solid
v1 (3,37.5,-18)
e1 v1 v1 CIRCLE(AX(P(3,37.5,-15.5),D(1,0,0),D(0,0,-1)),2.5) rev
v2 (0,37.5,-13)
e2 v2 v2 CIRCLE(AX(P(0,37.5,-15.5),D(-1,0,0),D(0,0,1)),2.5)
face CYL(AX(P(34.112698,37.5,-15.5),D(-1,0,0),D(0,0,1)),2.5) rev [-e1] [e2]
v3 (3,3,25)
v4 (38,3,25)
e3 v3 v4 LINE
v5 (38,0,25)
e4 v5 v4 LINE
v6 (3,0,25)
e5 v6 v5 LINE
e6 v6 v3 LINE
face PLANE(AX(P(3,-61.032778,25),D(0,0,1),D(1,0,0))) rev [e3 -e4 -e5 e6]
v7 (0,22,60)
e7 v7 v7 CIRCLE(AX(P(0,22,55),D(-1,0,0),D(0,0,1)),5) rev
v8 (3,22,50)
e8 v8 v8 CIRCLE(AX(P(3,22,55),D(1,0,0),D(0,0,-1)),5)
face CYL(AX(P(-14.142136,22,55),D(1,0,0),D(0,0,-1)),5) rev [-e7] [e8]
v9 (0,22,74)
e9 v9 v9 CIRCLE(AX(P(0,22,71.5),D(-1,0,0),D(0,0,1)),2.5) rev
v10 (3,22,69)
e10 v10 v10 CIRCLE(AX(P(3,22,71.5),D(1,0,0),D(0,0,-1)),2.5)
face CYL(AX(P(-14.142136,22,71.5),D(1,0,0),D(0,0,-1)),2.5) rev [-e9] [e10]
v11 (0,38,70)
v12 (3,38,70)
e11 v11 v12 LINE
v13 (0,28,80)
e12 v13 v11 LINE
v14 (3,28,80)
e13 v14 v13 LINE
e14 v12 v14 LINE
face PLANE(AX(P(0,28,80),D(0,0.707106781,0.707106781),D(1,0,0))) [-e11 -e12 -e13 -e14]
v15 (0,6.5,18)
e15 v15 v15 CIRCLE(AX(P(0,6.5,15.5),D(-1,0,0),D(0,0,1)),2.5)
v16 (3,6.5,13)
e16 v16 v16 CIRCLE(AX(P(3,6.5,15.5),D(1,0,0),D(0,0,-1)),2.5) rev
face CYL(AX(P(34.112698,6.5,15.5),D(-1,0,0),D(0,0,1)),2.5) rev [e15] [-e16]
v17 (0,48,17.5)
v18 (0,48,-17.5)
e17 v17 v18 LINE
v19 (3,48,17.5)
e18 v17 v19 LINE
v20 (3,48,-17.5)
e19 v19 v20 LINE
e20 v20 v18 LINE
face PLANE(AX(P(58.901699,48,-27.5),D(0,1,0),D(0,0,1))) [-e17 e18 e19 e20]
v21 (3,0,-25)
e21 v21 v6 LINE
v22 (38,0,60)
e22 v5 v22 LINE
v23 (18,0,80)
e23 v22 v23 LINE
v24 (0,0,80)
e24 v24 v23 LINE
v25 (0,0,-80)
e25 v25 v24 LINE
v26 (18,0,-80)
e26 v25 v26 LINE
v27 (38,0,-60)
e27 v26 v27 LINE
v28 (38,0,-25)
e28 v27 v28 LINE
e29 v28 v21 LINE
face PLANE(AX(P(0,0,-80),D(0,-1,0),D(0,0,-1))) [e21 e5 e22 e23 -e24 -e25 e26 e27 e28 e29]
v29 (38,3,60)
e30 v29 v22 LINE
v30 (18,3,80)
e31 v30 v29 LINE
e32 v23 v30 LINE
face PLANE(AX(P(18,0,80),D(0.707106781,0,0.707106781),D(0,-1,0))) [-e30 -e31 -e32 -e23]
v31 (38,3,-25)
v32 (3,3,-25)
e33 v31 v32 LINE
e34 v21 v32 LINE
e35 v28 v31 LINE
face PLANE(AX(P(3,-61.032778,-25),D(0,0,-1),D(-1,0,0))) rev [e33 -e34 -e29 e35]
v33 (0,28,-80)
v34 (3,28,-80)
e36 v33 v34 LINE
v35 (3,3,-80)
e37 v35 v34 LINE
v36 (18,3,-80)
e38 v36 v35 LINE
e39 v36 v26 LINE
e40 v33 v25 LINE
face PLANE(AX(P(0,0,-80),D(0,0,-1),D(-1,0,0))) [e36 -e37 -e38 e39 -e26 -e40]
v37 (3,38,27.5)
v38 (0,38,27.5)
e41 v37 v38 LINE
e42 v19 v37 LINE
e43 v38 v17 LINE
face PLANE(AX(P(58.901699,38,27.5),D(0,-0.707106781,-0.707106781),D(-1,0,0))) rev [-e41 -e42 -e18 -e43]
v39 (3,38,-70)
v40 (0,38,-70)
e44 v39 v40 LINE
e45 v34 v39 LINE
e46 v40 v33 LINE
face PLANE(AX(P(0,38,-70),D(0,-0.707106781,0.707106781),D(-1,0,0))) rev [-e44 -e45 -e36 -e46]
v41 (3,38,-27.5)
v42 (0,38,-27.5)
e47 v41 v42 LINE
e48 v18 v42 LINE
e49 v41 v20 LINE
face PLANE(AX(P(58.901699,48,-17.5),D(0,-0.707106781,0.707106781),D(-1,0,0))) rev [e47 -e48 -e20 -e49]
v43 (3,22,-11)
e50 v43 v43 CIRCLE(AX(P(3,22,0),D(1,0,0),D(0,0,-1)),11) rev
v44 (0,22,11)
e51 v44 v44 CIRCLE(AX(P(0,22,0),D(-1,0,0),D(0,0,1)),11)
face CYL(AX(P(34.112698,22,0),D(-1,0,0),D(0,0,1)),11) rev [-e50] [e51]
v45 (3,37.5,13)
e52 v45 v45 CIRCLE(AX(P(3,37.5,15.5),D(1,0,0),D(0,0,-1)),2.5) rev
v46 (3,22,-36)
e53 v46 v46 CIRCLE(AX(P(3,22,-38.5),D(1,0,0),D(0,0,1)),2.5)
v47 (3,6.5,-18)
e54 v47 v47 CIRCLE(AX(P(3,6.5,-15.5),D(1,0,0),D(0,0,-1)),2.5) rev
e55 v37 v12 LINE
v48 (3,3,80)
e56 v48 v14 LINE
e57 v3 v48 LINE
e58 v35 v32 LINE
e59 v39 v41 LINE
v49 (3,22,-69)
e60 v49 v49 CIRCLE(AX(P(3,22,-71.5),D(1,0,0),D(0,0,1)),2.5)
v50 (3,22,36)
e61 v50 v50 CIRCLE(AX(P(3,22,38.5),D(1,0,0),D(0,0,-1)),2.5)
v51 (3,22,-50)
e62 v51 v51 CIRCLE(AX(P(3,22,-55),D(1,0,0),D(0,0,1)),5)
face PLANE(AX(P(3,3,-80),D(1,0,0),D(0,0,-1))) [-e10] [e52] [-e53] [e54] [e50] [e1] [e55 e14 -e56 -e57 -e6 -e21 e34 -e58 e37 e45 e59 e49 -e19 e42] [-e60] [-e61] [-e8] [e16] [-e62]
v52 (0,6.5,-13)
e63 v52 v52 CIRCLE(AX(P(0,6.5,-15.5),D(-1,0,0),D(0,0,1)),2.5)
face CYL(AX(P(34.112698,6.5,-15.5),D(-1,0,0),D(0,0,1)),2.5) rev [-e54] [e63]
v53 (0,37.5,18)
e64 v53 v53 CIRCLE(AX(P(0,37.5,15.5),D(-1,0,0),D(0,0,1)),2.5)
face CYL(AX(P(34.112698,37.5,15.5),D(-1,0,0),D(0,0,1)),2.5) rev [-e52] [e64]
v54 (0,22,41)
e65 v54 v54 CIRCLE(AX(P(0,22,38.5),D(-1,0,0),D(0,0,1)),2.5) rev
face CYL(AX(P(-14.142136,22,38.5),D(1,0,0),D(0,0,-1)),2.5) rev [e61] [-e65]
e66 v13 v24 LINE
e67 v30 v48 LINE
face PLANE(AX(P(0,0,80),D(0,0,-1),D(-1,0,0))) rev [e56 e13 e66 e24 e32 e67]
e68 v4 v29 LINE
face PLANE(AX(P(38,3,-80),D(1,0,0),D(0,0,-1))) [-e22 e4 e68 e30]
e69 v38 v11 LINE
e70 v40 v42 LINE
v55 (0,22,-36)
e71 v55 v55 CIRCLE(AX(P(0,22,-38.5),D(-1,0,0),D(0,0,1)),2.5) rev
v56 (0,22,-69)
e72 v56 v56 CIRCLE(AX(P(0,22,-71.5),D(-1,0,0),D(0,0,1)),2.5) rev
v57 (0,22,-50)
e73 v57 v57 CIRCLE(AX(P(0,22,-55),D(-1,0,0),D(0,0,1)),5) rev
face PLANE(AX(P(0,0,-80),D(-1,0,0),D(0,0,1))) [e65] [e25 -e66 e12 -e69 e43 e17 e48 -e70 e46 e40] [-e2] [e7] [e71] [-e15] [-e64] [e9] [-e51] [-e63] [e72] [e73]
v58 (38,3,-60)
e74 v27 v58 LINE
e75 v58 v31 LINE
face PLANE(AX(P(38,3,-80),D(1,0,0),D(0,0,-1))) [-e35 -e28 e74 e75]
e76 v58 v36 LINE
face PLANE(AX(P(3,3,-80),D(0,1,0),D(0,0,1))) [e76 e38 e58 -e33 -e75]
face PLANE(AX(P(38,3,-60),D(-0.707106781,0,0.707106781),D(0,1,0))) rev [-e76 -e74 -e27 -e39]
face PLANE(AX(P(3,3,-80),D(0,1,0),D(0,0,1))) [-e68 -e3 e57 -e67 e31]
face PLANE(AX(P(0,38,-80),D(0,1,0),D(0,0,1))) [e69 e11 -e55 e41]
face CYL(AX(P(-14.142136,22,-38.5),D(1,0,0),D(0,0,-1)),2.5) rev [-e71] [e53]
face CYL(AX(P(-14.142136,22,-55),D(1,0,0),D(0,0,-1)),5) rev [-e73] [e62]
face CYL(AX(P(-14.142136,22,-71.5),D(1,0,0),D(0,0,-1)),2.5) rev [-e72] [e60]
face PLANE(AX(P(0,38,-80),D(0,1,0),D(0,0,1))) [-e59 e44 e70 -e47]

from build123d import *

# Parameters (mm, degrees)
SALIENTE_EXTRUIR1_DEPTH      = 80
SALIENTE_EXTRUIR1_DEPTH_BACK = 80
CROQUIS2_W                   = 35
CROQUIS2_H                   = 50
CORTAR_EXTRUIR1_DEPTH        = 3
CHAFL_N1_SIZE                = 20
CROQUIS3_R                   = 5
CROQUIS3_R_2                 = 2.5
CORTAR_EXTRUIR2_DEPTH        = 3
CROQUIS4_W                   = 55
CROQUIS4_H                   = 10
SALIENTE_EXTRUIR2_DEPTH      = 3
CROQUIS5_R                   = 2.5
CROQUIS5_R_2                 = 11
CORTAR_EXTRUIR3_DEPTH        = 3
CHAFL_N2_SIZE                = 10


with BuildPart() as part:
    # Croquis1 → Saliente-Extruir1 (new, two sides: drawn at the far end of the back side and taken through both)
    with BuildSketch(Plane.XY.offset(-SALIENTE_EXTRUIR1_DEPTH_BACK)):
        Polygon((0, 0), (0, 38), (3, 38), (3, 3), (38, 3), (38, 0), align=None)
    extrude(amount=SALIENTE_EXTRUIR1_DEPTH + SALIENTE_EXTRUIR1_DEPTH_BACK)

    # Croquis2 → Cortar-Extruir1 (cut)
    with BuildSketch(Plane(origin=(0, 3, 0), x_dir=(1, 0, 0), z_dir=(0, 1, 0))):
        with Locations((20.5, 0)):
            Rectangle(CROQUIS2_W, CROQUIS2_H)
    extrude(amount=-CORTAR_EXTRUIR1_DEPTH, mode=Mode.SUBTRACT)

    # Chaflán1
    chafl_n1_edges = [part.edges().sort_by_distance(p)[0] for p in [
        (38, 1.5, 80),
        (38, 1.5, -80),
    ]]
    chamfer(chafl_n1_edges, length=CHAFL_N1_SIZE)

    # Croquis3 → Cortar-Extruir2 (cut)
    with BuildSketch(Plane(origin=(3, 0, 0), x_dir=(0, 0, -1), z_dir=(1, 0, 0))):
        with Locations((-55, 22)):
            Circle(CROQUIS3_R)
        with Locations((-71.5, 22)):
            Circle(CROQUIS3_R_2)
        with Locations((-38.5, 22)):
            Circle(CROQUIS3_R_2)
        with Locations(Location((38.5, 22, 0), (0, 0, 180))):
            Circle(CROQUIS3_R_2)
        with Locations(Location((55, 22, 0), (0, 0, 180))):
            Circle(CROQUIS3_R)
        with Locations(Location((71.5, 22, 0), (0, 0, 180))):
            Circle(CROQUIS3_R_2)
    extrude(amount=-CORTAR_EXTRUIR2_DEPTH, mode=Mode.SUBTRACT)

    # Croquis4 → Saliente-Extruir2 (add)
    with BuildSketch(Plane.ZY):
        with Locations((0, 43)):
            Rectangle(CROQUIS4_W, CROQUIS4_H)
    extrude(amount=-SALIENTE_EXTRUIR2_DEPTH)

    # Croquis5 → Cortar-Extruir3 (cut)
    with BuildSketch(Plane.ZY):
        with Locations((-15.5, 37.5)):
            Circle(CROQUIS5_R)
        with Locations((15.5, 37.5)):
            Circle(CROQUIS5_R)
        with Locations((15.5, 6.5)):
            Circle(CROQUIS5_R)
        with Locations((-15.5, 6.5)):
            Circle(CROQUIS5_R)
        with Locations((0, 22)):
            Circle(CROQUIS5_R_2)
    extrude(amount=-CORTAR_EXTRUIR3_DEPTH, mode=Mode.SUBTRACT)

    # Chaflán2
    chafl_n2_edges = [part.edges().sort_by_distance(p)[0] for p in [
        (1.5, 38, 80),
        (1.5, 38, -80),
        (1.5, 48, -27.5),
        (1.5, 48, 27.5),
    ]]
    chamfer(chafl_n2_edges, length=CHAFL_N2_SIZE - 0.0001)  # a hair under: the kernel refuses the full size


solid = part.part
